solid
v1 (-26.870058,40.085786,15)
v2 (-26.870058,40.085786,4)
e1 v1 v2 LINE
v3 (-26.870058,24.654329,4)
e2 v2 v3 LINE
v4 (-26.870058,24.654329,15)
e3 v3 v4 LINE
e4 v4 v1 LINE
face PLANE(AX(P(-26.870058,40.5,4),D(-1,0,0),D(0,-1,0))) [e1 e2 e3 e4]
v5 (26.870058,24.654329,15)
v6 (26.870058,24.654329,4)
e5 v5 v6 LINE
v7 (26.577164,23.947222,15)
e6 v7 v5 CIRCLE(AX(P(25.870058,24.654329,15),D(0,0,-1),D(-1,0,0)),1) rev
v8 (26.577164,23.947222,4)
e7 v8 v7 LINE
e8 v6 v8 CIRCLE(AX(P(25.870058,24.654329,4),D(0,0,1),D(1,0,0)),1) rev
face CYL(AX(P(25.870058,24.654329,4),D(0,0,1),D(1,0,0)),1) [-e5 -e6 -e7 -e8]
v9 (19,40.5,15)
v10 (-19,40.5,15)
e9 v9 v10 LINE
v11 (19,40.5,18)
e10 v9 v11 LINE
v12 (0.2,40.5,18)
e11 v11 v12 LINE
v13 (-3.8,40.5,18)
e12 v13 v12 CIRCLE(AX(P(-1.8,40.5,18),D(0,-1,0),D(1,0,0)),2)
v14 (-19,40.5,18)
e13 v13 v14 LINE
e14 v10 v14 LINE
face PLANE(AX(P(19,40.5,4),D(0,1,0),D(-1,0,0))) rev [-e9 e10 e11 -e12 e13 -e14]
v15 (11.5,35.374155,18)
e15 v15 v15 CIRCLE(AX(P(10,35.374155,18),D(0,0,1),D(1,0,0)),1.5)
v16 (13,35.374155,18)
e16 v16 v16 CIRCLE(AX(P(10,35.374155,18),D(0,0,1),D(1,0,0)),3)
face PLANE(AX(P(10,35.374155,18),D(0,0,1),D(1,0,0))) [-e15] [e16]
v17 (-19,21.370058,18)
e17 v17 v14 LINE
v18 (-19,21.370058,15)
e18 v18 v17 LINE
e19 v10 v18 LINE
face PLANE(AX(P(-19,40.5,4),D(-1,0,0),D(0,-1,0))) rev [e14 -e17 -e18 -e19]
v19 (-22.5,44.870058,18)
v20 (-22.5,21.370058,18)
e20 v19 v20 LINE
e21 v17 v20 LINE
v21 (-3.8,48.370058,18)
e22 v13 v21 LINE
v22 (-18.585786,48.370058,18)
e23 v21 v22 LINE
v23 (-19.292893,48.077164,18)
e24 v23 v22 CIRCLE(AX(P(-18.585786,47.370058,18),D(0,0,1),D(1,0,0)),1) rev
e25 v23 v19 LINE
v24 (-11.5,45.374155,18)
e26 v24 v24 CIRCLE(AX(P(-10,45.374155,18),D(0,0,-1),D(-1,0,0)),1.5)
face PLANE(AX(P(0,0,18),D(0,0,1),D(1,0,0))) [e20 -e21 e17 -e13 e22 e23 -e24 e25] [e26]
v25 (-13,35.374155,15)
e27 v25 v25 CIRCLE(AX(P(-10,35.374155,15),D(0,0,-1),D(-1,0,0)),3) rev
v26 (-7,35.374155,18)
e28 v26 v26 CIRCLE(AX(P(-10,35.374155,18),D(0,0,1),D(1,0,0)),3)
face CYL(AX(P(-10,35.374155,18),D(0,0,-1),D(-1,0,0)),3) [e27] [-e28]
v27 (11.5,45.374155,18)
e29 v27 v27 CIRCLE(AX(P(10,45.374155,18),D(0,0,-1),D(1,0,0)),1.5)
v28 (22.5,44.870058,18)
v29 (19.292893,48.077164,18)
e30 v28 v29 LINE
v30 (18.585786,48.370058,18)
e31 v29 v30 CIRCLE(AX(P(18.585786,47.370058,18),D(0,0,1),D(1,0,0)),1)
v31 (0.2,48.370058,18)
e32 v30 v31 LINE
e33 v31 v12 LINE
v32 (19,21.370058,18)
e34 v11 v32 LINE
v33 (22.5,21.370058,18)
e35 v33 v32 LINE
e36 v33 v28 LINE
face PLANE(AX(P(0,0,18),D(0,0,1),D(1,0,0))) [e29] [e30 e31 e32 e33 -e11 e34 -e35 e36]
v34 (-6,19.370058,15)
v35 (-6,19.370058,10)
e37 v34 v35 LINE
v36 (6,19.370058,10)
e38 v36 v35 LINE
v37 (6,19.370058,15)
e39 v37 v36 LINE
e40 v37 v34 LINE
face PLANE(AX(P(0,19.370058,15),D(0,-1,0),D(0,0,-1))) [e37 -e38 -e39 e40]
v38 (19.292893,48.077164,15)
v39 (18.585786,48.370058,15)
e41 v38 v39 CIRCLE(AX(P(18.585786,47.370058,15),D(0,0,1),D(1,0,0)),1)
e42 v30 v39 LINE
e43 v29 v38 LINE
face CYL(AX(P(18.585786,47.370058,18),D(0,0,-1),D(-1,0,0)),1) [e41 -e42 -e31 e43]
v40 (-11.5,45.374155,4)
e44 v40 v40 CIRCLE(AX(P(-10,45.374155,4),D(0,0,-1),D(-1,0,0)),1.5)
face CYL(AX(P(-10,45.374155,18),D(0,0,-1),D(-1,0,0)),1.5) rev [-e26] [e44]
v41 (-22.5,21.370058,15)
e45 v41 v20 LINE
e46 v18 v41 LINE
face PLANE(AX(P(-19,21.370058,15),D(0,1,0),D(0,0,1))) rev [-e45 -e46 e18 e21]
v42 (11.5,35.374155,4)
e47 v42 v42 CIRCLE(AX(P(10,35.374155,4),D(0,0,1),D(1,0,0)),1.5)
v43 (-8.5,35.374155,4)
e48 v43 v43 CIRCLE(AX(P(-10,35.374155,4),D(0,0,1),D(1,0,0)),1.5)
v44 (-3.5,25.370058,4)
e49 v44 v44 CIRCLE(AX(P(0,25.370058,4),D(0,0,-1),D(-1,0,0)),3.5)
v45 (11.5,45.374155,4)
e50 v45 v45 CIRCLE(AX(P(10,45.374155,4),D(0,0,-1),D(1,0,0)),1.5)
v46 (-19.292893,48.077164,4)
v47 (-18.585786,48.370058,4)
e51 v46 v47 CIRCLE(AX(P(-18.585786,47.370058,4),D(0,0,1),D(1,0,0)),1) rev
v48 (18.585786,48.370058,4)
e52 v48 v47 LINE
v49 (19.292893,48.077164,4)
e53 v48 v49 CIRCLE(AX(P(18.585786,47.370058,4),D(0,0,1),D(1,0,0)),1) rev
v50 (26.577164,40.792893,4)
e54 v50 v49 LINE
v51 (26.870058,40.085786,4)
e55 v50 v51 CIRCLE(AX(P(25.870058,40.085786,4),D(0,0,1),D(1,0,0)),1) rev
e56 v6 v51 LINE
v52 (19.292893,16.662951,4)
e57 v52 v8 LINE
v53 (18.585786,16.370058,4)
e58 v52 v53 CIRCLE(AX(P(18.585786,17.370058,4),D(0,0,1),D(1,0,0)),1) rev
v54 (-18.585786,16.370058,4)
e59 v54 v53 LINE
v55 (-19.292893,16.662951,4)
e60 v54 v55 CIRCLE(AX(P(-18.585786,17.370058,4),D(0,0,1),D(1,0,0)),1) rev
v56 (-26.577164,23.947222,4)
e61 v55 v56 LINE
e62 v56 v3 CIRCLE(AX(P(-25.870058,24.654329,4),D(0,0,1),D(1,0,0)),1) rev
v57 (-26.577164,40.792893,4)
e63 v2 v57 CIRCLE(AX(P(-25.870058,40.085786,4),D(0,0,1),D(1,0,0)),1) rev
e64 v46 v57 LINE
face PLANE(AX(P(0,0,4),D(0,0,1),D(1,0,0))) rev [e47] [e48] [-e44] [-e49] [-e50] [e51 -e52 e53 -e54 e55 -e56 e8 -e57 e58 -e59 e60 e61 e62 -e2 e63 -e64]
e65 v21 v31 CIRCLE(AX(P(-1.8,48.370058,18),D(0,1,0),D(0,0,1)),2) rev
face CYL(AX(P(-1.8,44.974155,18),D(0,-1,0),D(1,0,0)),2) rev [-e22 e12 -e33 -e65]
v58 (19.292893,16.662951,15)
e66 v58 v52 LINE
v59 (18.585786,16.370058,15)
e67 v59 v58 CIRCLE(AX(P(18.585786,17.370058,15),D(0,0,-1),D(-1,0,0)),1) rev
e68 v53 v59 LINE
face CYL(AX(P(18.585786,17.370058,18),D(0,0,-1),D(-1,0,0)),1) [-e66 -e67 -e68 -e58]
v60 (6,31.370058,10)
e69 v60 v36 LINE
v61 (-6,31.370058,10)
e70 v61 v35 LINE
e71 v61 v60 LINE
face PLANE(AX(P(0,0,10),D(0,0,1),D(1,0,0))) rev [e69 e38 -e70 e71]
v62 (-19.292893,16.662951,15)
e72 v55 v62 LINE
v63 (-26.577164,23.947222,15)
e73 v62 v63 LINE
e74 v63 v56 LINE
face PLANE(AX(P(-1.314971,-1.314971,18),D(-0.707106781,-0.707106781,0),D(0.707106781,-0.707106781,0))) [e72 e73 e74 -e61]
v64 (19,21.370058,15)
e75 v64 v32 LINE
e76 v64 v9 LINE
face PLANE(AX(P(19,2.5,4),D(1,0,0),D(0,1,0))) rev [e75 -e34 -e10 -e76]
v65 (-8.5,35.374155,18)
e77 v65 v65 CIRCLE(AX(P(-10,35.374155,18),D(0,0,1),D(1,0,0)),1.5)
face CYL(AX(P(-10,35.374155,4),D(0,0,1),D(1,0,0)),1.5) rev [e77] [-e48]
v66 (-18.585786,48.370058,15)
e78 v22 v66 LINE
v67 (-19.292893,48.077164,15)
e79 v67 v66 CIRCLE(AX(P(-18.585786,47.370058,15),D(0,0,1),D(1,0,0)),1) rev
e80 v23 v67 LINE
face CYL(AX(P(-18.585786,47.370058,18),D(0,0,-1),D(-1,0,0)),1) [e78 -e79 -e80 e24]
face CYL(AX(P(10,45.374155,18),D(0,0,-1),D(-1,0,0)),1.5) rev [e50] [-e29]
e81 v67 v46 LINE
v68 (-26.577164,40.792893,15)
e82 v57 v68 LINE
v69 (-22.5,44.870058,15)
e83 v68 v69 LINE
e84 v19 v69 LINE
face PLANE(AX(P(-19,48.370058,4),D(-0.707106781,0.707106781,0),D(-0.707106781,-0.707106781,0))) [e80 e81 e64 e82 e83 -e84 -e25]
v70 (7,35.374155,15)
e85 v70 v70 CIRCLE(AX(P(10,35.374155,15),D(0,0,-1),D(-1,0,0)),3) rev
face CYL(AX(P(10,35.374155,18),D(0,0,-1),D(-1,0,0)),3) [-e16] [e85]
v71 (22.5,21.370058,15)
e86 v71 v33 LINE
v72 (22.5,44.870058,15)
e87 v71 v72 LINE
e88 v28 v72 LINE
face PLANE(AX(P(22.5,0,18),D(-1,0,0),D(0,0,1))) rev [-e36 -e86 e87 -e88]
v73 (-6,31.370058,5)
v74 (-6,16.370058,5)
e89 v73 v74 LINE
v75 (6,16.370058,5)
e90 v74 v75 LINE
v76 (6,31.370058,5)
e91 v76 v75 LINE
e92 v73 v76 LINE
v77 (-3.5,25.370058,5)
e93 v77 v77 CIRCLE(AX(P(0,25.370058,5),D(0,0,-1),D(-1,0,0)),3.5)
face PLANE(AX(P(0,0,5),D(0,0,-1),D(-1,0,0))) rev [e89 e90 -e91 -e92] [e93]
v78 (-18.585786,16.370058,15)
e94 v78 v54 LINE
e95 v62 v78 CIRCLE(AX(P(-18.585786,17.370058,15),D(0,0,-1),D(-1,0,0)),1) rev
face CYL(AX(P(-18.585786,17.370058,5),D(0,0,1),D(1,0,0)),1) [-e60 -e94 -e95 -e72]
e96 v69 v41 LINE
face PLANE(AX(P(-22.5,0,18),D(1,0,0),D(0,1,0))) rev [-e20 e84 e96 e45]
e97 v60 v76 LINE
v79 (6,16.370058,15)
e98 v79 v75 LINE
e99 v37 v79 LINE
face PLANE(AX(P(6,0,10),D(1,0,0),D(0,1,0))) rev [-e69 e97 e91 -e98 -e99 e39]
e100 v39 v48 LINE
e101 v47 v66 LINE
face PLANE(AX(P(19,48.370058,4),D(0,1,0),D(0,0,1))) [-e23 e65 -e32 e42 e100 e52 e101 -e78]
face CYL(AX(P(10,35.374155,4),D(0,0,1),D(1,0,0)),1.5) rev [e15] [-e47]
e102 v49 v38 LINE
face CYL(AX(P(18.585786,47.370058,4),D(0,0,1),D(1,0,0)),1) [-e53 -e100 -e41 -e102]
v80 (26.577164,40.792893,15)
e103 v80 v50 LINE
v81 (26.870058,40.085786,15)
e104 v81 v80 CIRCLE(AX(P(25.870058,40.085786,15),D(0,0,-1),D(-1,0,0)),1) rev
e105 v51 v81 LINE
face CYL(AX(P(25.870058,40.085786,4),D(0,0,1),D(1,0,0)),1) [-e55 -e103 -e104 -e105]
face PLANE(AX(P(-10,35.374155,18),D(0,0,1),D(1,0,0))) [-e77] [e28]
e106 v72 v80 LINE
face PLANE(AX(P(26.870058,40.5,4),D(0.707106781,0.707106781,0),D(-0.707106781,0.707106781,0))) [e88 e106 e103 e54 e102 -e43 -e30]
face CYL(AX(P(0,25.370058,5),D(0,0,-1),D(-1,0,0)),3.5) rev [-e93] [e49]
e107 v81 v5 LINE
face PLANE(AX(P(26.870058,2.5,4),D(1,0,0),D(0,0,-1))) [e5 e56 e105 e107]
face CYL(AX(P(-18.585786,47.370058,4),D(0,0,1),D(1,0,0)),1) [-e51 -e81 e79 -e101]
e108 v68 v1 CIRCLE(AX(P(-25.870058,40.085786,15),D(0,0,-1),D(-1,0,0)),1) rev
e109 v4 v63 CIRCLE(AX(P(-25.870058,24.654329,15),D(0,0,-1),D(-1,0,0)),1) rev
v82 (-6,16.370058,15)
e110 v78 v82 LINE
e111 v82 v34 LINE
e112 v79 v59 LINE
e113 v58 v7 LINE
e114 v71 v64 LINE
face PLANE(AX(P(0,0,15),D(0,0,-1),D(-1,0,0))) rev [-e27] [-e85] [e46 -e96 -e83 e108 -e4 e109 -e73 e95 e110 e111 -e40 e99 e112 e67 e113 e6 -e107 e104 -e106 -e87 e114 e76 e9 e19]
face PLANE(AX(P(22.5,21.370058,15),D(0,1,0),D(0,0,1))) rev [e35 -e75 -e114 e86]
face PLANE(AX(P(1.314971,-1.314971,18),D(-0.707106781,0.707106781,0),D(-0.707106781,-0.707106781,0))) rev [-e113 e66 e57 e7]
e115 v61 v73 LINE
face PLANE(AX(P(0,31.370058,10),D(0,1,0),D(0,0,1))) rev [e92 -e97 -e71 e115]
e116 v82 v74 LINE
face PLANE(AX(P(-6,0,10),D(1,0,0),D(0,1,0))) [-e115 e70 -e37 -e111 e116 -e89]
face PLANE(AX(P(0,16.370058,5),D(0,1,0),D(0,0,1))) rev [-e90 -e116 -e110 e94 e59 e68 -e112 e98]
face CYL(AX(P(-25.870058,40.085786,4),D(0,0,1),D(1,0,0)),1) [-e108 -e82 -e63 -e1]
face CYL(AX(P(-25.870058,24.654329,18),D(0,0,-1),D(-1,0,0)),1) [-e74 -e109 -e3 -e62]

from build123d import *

# Parameters (mm, degrees)
CROQUIS3_W                   = 38
CROQUIS3_H                   = 38
SALIENTE_EXTRUIR9_DEPTH      = 1
SALIENTE_EXTRUIR10_START     = -11
SALIENTE_EXTRUIR10_OUTLINE_W = 38
SALIENTE_EXTRUIR10_OUTLINE_H = 38
SALIENTE_EXTRUIR10_DEPTH     = 10
CROQUIS13_W                  = 38
CROQUIS13_H                  = 38
SALIENTE_EXTRUIR15_DEPTH     = 3
CROQUIS14_R                  = 1.5
CORTAR_EXTRUIR1_DEPTH        = 14
CROQUIS15_W                  = 38
CROQUIS15_H                  = 24.129942315
CROQUIS15_R                  = 3.5
SALIENTE_EXTRUIR16_DEPTH     = 1
CORTAR_EXTRUIR2_DEPTH        = 14
SALIENTE_EXTRUIR17_DEPTH     = 5
SALIENTE_EXTRUIR18_DEPTH     = 5
CORTAR_EXTRUIR3_DEPTH        = 3
REDONDEO11_R                 = 1
CROQUIS21_R                  = 1.5
CORTAR_EXTRUIR4_DEPTH        = 11
SALIENTE_EXTRUIR20_START     = 3
CROQUIS22_R                  = 3
CROQUIS22_R_2                = 1.5
SALIENTE_EXTRUIR20_DEPTH     = 3


# Read off the part's stored shape, not the designer's step: Saliente-Extruir10
with BuildPart() as part:
    # Croquis3 → Saliente-Extruir9 (new body)
    with BuildSketch(Plane.XY.offset(5)):
        Polygon((19, -5.370057685), (26.870057685, 2.5), (26.870057685, 40.5), (19, 48.370057685), (-19, 48.370057685), (-26.870057685, 40.5), (-26.870057685, 2.5), (-19, -5.370057685), align=None)
        with Locations((0, 21.5)):
            Rectangle(CROQUIS3_W, CROQUIS3_H, mode=Mode.SUBTRACT)
    extrude(amount=-SALIENTE_EXTRUIR9_DEPTH)

    # Saliente-Extruir10 outline → Saliente-Extruir10 (add)
    with BuildSketch(Plane(origin=(0, 0, 4), x_dir=(-1, 0, 0), z_dir=(0, 0, -1)).offset(SALIENTE_EXTRUIR10_START)):
        Polygon((-26.870057685, 2.5), (-19, -5.370057685), (19, -5.370057685), (26.870057685, 2.5), (26.870057685, 40.5), (19, 48.370057685), (-19, 48.370057685), (-26.870057685, 40.5), align=None)
        with Locations((0, 21.5)):
            Rectangle(SALIENTE_EXTRUIR10_OUTLINE_W, SALIENTE_EXTRUIR10_OUTLINE_H, mode=Mode.SUBTRACT)
    extrude(amount=SALIENTE_EXTRUIR10_DEPTH)

    # Croquis13 → Saliente-Extruir15 (add)
    with BuildSketch(Plane.XY.offset(15)):
        with BuildLine():
            Line((-22.5, 44.870057685), (-22.5, -1))
            Line((-22.5, -1), (22.5, -1))
            Line((22.5, -1), (22.5, 44.870057685))
            Line((22.5, 44.870057685), (19.292893219, 48.077164466))
            ThreePointArc((19.292893219, 48.077164466), (18.96846987, 48.293937218), (18.585786438, 48.370057685))
            Line((18.585786438, 48.370057685), (-18.585786438, 48.370057685))
            ThreePointArc((-18.585786438, 48.370057685), (-18.96846987, 48.293937218), (-19.292893219, 48.077164466))
            Line((-19.292893219, 48.077164466), (-22.5, 44.870057685))
        make_face()
        with Locations((0, 21.5)):
            Rectangle(CROQUIS13_W, CROQUIS13_H, mode=Mode.SUBTRACT)
    extrude(amount=SALIENTE_EXTRUIR15_DEPTH)

    # Croquis14 → Cortar-Extruir1 (cut)
    with BuildSketch(Plane(origin=(0, 0, 4), x_dir=(-1, 0, 0), z_dir=(0, 0, -1))):
        with Locations((10, 45.37415474)):
            Circle(CROQUIS14_R)
        with Locations(Location((-10, 45.37415474, 0), (0, 0, 180))):
            Circle(CROQUIS14_R)
    extrude(amount=-CORTAR_EXTRUIR1_DEPTH, mode=Mode.SUBTRACT)

    # Croquis15 → Saliente-Extruir16 (add)
    with BuildSketch(Plane(origin=(0, 0, 4), x_dir=(-1, 0, 0), z_dir=(0, 0, -1))):
        with Locations((0, 28.435028843)):
            Rectangle(CROQUIS15_W, CROQUIS15_H)
        with Locations((0, 25.370057685)):
            Circle(CROQUIS15_R, mode=Mode.SUBTRACT)
    extrude(amount=-SALIENTE_EXTRUIR16_DEPTH)

    # Croquis16 → Cortar-Extruir2 (cut)
    with BuildSketch(Plane(origin=(0, 0, 4), x_dir=(-1, 0, 0), z_dir=(0, 0, -1))):
        Polygon((-19, 2.5), (-19, 16.370057685), (-26.870057685, 24.24011537), (-26.870057685, 2.5), (-19, -5.370057685), (19, -5.370057685), (26.870057685, 2.5), (26.870057685, 24.24011537), (19, 16.370057685), (19, 2.5), align=None)
    extrude(amount=-CORTAR_EXTRUIR2_DEPTH, mode=Mode.SUBTRACT)

    # Croquis17 → Saliente-Extruir17 (add)
    with BuildSketch(Plane.XY.offset(5)):
        Polygon((6, 31.370057685), (6, 25.370057685), (6, 19.370057685), (6, 16.370057685), (19, 16.370057685), (19, 40.5), (-19, 40.5), (-19, 16.370057685), (-6, 16.370057685), (-6, 19.370057685), (-6, 31.370057685), align=None)
    extrude(amount=SALIENTE_EXTRUIR17_DEPTH)

    # Croquis18 → Saliente-Extruir18 (add)
    with BuildSketch(Plane.XY.offset(10)):
        Polygon((-19, 40.5), (-19, 16.370057685), (-6, 16.370057685), (-6, 19.370057685), (6, 19.370057685), (6, 16.370057685), (19, 16.370057685), (19, 40.5), align=None)
    extrude(amount=SALIENTE_EXTRUIR18_DEPTH)

    # Croquis19 → Cortar-Extruir3 (cut)
    with BuildSketch(Plane.XY.offset(18)):
        Polygon((-22.5, 19.870057685), (-19, 16.370057685), (-19, 21.370057685), (-22.5, 21.370057685), align=None)
        Polygon((19, 16.370057685), (22.5, 19.870057685), (22.5, 21.370057685), (19, 21.370057685), align=None)
    extrude(amount=-CORTAR_EXTRUIR3_DEPTH, mode=Mode.SUBTRACT)

    # Redondeo11
    redondeo11_edges = [part.edges().sort_by_distance(p)[0] for p in [
        (26.870057685, 40.5, 10),
        (19, 48.370057685, 10),
        (-19, 48.370057685, 10),
        (-26.870057685, 40.5, 10),
        (26.870057685, 24.24011537, 9.5),
        (19, 16.370057685, 9.5),
        (-26.870057685, 24.24011537, 9.5),
        (-19, 16.370057685, 9.5),
    ]]
    fillet(redondeo11_edges, radius=REDONDEO11_R)

    # Croquis21 → Cortar-Extruir4 (cut)
    with BuildSketch(Plane.XY.offset(15)):
        with Locations((-10, 35.37415474)):
            Circle(CROQUIS21_R)
        with Locations((10, 35.37415474)):
            Circle(CROQUIS21_R)
    extrude(amount=-CORTAR_EXTRUIR4_DEPTH, mode=Mode.SUBTRACT)

    # Croquis22 → Saliente-Extruir20 (add)
    # profile 1 of 2: a face of its own
    with BuildSketch(Plane.XY.offset(15).offset(SALIENTE_EXTRUIR20_START)):
        with Locations(Location((-10, 35.37415474, 0), (0, 0, 180))):
            Circle(CROQUIS22_R)
        with Locations((-10, 35.37415474)):
            Circle(CROQUIS22_R_2, mode=Mode.SUBTRACT)
    # profile 2 of 2: a face of its own
    with BuildSketch(Plane.XY.offset(15).offset(SALIENTE_EXTRUIR20_START)):
        with Locations(Location((10, 35.37415474, 0), (0, 0, 180))):
            Circle(CROQUIS22_R)
        with Locations((10, 35.37415474)):
            Circle(CROQUIS22_R_2, mode=Mode.SUBTRACT)
    extrude(amount=-SALIENTE_EXTRUIR20_DEPTH)

    # Croquis23 → Cortar-Revolución1 (revolve, cut)
    with BuildSketch(Plane.XY.offset(18)):
        Polygon((-1.8, 48.370057685), (-1.8, 44.97415474), (-1.8, 40.5), (0.2, 40.5), (0.2, 48.370057685), align=None)
    revolve(axis=Axis((-1.8, 44.97415474, 18), (0, 1, 0)), mode=Mode.SUBTRACT)


solid = part.part
